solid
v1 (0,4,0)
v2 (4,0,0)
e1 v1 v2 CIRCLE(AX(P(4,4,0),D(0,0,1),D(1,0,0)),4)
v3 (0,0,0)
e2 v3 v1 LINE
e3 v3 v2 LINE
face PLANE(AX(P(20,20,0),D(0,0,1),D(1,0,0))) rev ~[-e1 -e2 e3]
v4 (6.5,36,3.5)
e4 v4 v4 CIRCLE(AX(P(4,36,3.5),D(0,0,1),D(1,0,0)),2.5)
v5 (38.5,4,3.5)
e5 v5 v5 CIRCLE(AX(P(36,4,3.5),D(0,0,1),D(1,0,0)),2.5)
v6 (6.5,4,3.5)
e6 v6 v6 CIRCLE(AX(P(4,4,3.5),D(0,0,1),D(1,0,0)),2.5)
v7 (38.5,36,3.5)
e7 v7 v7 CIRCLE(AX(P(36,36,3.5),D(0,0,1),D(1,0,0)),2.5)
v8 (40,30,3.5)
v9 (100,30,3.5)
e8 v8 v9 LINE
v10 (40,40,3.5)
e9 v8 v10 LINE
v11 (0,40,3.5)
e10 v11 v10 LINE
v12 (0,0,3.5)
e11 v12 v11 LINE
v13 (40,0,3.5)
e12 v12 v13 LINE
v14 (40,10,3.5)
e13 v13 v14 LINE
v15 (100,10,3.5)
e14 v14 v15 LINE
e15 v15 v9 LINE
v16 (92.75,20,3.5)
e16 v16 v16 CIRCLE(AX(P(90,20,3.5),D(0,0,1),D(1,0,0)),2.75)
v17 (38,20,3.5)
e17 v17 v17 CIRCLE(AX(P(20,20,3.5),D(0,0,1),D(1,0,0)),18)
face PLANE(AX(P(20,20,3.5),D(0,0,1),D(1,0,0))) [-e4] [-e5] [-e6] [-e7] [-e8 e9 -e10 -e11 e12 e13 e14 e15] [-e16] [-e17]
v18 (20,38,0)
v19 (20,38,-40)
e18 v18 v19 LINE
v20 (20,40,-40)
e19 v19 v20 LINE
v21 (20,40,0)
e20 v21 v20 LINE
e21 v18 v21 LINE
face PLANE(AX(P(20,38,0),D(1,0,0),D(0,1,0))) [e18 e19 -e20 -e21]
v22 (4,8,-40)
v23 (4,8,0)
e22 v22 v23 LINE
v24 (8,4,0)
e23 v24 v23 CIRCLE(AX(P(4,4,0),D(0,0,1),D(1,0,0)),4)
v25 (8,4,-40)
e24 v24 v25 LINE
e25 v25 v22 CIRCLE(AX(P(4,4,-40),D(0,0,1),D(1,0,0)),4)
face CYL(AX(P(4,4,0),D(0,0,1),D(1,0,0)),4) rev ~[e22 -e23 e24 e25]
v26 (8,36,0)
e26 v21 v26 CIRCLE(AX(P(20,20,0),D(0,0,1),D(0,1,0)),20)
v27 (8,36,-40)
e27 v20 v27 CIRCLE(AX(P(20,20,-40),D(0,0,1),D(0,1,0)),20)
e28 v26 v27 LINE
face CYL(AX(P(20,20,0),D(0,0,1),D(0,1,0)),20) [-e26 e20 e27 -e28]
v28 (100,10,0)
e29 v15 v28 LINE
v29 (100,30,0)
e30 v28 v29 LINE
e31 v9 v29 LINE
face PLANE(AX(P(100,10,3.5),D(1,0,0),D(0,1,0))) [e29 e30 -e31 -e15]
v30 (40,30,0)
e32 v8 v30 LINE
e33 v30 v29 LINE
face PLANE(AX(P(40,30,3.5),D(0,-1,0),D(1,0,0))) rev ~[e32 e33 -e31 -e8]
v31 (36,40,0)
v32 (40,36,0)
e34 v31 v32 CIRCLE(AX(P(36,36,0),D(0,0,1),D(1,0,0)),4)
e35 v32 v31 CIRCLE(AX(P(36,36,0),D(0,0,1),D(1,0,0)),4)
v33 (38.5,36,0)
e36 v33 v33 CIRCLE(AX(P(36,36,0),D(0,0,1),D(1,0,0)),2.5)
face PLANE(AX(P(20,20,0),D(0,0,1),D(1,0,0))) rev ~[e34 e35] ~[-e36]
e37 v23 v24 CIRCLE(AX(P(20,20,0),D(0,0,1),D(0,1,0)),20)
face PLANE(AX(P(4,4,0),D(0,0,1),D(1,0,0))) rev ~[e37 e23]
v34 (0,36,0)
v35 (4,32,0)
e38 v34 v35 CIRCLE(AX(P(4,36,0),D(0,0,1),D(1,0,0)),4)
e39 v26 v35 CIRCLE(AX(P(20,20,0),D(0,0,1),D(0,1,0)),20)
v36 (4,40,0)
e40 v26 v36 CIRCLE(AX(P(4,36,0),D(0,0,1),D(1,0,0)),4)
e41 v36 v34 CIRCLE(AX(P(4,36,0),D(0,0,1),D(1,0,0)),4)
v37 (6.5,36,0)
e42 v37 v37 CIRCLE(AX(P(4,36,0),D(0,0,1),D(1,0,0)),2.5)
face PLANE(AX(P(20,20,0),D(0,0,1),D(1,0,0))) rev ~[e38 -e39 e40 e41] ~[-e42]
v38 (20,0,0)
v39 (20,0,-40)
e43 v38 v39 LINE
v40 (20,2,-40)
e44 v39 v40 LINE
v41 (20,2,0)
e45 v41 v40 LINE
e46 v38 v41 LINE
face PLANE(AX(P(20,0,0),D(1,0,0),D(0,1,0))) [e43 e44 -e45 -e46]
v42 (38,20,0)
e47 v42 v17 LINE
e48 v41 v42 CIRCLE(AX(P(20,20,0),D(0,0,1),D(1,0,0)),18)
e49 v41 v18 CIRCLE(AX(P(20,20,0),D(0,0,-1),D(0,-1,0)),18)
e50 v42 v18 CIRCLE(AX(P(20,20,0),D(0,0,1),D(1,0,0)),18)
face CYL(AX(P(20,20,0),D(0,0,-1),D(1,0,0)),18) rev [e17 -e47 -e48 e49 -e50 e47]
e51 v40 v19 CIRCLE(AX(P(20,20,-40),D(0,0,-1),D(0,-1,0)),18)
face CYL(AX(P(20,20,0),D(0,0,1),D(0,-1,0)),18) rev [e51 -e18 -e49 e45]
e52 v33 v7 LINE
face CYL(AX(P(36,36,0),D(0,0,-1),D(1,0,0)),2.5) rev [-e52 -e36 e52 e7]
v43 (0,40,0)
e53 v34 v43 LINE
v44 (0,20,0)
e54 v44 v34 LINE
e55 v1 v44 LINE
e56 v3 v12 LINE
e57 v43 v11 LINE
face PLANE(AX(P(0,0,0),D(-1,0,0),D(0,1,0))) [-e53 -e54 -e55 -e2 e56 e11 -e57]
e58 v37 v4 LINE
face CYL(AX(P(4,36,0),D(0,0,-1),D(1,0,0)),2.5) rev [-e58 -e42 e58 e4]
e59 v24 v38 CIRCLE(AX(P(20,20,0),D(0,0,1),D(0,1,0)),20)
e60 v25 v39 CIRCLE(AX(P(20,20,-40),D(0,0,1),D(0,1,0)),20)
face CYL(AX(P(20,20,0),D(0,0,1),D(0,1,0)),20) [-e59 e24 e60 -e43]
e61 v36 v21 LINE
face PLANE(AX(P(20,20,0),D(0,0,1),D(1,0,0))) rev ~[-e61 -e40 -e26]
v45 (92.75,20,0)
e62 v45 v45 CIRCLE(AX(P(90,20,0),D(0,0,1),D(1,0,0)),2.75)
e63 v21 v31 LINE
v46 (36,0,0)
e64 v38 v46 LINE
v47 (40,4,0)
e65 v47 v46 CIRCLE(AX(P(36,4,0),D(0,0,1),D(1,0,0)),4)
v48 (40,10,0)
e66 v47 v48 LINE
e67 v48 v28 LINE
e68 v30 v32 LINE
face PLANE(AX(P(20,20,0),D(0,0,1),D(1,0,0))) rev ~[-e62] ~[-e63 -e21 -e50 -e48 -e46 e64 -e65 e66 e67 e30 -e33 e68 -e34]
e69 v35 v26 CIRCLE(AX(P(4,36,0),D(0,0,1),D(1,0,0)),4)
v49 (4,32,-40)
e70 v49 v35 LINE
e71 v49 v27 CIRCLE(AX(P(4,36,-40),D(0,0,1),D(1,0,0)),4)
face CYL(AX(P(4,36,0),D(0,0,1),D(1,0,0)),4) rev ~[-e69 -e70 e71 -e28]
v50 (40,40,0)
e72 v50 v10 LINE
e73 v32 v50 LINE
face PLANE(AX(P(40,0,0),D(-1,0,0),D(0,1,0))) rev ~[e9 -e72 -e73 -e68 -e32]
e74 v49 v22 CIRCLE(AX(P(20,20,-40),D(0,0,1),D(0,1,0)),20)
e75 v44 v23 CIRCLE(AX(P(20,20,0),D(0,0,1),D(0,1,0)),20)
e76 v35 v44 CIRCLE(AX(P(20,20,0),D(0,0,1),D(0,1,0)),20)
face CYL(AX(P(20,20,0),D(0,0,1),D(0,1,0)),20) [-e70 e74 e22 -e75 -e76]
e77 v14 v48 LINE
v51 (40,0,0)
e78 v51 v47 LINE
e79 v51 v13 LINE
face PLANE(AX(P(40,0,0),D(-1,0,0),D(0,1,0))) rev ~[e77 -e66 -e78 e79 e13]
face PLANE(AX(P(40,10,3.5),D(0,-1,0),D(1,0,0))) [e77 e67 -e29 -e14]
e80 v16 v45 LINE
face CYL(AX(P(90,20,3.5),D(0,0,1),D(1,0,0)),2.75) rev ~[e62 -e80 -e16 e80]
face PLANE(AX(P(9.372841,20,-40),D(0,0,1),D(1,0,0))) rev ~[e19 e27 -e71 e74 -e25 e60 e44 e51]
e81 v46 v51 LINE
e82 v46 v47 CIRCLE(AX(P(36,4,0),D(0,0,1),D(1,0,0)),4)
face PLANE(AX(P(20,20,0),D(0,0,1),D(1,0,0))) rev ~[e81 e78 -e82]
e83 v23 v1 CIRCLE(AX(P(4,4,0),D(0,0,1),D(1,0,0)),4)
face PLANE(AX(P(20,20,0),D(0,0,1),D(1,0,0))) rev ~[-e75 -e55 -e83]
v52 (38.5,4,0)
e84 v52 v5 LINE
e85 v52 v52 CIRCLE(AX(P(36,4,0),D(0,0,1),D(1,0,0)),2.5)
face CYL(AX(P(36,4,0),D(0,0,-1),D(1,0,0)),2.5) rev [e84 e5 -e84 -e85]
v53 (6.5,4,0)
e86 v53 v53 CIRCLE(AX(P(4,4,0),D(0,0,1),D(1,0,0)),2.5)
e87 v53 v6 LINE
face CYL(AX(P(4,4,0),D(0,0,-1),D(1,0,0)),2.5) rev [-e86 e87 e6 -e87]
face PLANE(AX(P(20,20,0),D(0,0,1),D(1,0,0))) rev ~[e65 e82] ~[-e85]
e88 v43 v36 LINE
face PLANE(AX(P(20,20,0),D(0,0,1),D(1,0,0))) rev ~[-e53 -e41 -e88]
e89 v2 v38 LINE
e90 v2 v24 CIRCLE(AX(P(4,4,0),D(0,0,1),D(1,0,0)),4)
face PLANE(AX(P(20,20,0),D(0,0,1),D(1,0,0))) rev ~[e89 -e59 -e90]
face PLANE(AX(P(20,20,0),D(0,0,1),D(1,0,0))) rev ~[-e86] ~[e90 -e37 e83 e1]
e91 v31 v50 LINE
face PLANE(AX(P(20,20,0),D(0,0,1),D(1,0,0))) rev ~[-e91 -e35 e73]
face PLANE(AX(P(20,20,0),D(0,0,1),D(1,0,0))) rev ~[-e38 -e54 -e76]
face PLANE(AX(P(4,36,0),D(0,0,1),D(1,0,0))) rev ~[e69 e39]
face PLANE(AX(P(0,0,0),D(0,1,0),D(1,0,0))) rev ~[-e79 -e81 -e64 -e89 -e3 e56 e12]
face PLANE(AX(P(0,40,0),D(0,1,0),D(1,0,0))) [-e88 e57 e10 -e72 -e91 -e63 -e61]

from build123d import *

# Parameters (mm, degrees)
F0_W     = 40
F0_H     = 40
F0_R     = 2.5
F0_R_2   = 18
F1_DEPTH = 3.5
F2_W     = 60
F2_H     = 20
F2_R     = 2.75
F3_DEPTH = 3.5
F7_DEPTH = 40
F8_R     = 4
F9_DEPTH = 40.001


with BuildPart() as f1:
    # F0 (on Top) → F1 (new body)
    with BuildSketch(Plane.XY):
        with Locations((20, 20)):
            Rectangle(F0_W, F0_H)
        with Locations((4, 4)):
            Circle(F0_R, mode=Mode.SUBTRACT)
        with Locations((36, 4)):
            Circle(F0_R, mode=Mode.SUBTRACT)
        with Locations((4, 36)):
            Circle(F0_R, mode=Mode.SUBTRACT)
        with Locations((20, 20)):
            Circle(F0_R_2, mode=Mode.SUBTRACT)
        with Locations((36, 36)):
            Circle(F0_R, mode=Mode.SUBTRACT)
    extrude(amount=F1_DEPTH)

    # F2 (on face) → F3 (join, through all)
    with BuildSketch(Plane.XY.offset(3.5)):
        with Locations((70, 20)):
            Rectangle(F2_W, F2_H)
        with Locations((90, 20)):
            Circle(F2_R, mode=Mode.SUBTRACT)
    extrude(amount=-F3_DEPTH)

    # F6 (on face) → F7 (join, through all)
    with BuildSketch(Plane.XY):
        with BuildLine():
            Line((20, 38), (20, 40))
            ThreePointArc((20, 40), (0, 20), (20, 0))
            Line((20, 0), (20, 2))
            ThreePointArc((20, 2), (2, 20), (20, 38))
        make_face()
    extrude(amount=-F7_DEPTH)

    # F8 (on face) → F9 (cut, through all)
    with BuildSketch(Plane.XY):
        with Locations((36, 36)):
            Circle(F8_R)
        with Locations((4, 36)):
            Circle(F8_R)
        with Locations((4, 4)):
            Circle(F8_R)
        with Locations((36, 4)):
            Circle(F8_R)
    extrude(amount=-F9_DEPTH, mode=Mode.SUBTRACT)


solid = f1.part
